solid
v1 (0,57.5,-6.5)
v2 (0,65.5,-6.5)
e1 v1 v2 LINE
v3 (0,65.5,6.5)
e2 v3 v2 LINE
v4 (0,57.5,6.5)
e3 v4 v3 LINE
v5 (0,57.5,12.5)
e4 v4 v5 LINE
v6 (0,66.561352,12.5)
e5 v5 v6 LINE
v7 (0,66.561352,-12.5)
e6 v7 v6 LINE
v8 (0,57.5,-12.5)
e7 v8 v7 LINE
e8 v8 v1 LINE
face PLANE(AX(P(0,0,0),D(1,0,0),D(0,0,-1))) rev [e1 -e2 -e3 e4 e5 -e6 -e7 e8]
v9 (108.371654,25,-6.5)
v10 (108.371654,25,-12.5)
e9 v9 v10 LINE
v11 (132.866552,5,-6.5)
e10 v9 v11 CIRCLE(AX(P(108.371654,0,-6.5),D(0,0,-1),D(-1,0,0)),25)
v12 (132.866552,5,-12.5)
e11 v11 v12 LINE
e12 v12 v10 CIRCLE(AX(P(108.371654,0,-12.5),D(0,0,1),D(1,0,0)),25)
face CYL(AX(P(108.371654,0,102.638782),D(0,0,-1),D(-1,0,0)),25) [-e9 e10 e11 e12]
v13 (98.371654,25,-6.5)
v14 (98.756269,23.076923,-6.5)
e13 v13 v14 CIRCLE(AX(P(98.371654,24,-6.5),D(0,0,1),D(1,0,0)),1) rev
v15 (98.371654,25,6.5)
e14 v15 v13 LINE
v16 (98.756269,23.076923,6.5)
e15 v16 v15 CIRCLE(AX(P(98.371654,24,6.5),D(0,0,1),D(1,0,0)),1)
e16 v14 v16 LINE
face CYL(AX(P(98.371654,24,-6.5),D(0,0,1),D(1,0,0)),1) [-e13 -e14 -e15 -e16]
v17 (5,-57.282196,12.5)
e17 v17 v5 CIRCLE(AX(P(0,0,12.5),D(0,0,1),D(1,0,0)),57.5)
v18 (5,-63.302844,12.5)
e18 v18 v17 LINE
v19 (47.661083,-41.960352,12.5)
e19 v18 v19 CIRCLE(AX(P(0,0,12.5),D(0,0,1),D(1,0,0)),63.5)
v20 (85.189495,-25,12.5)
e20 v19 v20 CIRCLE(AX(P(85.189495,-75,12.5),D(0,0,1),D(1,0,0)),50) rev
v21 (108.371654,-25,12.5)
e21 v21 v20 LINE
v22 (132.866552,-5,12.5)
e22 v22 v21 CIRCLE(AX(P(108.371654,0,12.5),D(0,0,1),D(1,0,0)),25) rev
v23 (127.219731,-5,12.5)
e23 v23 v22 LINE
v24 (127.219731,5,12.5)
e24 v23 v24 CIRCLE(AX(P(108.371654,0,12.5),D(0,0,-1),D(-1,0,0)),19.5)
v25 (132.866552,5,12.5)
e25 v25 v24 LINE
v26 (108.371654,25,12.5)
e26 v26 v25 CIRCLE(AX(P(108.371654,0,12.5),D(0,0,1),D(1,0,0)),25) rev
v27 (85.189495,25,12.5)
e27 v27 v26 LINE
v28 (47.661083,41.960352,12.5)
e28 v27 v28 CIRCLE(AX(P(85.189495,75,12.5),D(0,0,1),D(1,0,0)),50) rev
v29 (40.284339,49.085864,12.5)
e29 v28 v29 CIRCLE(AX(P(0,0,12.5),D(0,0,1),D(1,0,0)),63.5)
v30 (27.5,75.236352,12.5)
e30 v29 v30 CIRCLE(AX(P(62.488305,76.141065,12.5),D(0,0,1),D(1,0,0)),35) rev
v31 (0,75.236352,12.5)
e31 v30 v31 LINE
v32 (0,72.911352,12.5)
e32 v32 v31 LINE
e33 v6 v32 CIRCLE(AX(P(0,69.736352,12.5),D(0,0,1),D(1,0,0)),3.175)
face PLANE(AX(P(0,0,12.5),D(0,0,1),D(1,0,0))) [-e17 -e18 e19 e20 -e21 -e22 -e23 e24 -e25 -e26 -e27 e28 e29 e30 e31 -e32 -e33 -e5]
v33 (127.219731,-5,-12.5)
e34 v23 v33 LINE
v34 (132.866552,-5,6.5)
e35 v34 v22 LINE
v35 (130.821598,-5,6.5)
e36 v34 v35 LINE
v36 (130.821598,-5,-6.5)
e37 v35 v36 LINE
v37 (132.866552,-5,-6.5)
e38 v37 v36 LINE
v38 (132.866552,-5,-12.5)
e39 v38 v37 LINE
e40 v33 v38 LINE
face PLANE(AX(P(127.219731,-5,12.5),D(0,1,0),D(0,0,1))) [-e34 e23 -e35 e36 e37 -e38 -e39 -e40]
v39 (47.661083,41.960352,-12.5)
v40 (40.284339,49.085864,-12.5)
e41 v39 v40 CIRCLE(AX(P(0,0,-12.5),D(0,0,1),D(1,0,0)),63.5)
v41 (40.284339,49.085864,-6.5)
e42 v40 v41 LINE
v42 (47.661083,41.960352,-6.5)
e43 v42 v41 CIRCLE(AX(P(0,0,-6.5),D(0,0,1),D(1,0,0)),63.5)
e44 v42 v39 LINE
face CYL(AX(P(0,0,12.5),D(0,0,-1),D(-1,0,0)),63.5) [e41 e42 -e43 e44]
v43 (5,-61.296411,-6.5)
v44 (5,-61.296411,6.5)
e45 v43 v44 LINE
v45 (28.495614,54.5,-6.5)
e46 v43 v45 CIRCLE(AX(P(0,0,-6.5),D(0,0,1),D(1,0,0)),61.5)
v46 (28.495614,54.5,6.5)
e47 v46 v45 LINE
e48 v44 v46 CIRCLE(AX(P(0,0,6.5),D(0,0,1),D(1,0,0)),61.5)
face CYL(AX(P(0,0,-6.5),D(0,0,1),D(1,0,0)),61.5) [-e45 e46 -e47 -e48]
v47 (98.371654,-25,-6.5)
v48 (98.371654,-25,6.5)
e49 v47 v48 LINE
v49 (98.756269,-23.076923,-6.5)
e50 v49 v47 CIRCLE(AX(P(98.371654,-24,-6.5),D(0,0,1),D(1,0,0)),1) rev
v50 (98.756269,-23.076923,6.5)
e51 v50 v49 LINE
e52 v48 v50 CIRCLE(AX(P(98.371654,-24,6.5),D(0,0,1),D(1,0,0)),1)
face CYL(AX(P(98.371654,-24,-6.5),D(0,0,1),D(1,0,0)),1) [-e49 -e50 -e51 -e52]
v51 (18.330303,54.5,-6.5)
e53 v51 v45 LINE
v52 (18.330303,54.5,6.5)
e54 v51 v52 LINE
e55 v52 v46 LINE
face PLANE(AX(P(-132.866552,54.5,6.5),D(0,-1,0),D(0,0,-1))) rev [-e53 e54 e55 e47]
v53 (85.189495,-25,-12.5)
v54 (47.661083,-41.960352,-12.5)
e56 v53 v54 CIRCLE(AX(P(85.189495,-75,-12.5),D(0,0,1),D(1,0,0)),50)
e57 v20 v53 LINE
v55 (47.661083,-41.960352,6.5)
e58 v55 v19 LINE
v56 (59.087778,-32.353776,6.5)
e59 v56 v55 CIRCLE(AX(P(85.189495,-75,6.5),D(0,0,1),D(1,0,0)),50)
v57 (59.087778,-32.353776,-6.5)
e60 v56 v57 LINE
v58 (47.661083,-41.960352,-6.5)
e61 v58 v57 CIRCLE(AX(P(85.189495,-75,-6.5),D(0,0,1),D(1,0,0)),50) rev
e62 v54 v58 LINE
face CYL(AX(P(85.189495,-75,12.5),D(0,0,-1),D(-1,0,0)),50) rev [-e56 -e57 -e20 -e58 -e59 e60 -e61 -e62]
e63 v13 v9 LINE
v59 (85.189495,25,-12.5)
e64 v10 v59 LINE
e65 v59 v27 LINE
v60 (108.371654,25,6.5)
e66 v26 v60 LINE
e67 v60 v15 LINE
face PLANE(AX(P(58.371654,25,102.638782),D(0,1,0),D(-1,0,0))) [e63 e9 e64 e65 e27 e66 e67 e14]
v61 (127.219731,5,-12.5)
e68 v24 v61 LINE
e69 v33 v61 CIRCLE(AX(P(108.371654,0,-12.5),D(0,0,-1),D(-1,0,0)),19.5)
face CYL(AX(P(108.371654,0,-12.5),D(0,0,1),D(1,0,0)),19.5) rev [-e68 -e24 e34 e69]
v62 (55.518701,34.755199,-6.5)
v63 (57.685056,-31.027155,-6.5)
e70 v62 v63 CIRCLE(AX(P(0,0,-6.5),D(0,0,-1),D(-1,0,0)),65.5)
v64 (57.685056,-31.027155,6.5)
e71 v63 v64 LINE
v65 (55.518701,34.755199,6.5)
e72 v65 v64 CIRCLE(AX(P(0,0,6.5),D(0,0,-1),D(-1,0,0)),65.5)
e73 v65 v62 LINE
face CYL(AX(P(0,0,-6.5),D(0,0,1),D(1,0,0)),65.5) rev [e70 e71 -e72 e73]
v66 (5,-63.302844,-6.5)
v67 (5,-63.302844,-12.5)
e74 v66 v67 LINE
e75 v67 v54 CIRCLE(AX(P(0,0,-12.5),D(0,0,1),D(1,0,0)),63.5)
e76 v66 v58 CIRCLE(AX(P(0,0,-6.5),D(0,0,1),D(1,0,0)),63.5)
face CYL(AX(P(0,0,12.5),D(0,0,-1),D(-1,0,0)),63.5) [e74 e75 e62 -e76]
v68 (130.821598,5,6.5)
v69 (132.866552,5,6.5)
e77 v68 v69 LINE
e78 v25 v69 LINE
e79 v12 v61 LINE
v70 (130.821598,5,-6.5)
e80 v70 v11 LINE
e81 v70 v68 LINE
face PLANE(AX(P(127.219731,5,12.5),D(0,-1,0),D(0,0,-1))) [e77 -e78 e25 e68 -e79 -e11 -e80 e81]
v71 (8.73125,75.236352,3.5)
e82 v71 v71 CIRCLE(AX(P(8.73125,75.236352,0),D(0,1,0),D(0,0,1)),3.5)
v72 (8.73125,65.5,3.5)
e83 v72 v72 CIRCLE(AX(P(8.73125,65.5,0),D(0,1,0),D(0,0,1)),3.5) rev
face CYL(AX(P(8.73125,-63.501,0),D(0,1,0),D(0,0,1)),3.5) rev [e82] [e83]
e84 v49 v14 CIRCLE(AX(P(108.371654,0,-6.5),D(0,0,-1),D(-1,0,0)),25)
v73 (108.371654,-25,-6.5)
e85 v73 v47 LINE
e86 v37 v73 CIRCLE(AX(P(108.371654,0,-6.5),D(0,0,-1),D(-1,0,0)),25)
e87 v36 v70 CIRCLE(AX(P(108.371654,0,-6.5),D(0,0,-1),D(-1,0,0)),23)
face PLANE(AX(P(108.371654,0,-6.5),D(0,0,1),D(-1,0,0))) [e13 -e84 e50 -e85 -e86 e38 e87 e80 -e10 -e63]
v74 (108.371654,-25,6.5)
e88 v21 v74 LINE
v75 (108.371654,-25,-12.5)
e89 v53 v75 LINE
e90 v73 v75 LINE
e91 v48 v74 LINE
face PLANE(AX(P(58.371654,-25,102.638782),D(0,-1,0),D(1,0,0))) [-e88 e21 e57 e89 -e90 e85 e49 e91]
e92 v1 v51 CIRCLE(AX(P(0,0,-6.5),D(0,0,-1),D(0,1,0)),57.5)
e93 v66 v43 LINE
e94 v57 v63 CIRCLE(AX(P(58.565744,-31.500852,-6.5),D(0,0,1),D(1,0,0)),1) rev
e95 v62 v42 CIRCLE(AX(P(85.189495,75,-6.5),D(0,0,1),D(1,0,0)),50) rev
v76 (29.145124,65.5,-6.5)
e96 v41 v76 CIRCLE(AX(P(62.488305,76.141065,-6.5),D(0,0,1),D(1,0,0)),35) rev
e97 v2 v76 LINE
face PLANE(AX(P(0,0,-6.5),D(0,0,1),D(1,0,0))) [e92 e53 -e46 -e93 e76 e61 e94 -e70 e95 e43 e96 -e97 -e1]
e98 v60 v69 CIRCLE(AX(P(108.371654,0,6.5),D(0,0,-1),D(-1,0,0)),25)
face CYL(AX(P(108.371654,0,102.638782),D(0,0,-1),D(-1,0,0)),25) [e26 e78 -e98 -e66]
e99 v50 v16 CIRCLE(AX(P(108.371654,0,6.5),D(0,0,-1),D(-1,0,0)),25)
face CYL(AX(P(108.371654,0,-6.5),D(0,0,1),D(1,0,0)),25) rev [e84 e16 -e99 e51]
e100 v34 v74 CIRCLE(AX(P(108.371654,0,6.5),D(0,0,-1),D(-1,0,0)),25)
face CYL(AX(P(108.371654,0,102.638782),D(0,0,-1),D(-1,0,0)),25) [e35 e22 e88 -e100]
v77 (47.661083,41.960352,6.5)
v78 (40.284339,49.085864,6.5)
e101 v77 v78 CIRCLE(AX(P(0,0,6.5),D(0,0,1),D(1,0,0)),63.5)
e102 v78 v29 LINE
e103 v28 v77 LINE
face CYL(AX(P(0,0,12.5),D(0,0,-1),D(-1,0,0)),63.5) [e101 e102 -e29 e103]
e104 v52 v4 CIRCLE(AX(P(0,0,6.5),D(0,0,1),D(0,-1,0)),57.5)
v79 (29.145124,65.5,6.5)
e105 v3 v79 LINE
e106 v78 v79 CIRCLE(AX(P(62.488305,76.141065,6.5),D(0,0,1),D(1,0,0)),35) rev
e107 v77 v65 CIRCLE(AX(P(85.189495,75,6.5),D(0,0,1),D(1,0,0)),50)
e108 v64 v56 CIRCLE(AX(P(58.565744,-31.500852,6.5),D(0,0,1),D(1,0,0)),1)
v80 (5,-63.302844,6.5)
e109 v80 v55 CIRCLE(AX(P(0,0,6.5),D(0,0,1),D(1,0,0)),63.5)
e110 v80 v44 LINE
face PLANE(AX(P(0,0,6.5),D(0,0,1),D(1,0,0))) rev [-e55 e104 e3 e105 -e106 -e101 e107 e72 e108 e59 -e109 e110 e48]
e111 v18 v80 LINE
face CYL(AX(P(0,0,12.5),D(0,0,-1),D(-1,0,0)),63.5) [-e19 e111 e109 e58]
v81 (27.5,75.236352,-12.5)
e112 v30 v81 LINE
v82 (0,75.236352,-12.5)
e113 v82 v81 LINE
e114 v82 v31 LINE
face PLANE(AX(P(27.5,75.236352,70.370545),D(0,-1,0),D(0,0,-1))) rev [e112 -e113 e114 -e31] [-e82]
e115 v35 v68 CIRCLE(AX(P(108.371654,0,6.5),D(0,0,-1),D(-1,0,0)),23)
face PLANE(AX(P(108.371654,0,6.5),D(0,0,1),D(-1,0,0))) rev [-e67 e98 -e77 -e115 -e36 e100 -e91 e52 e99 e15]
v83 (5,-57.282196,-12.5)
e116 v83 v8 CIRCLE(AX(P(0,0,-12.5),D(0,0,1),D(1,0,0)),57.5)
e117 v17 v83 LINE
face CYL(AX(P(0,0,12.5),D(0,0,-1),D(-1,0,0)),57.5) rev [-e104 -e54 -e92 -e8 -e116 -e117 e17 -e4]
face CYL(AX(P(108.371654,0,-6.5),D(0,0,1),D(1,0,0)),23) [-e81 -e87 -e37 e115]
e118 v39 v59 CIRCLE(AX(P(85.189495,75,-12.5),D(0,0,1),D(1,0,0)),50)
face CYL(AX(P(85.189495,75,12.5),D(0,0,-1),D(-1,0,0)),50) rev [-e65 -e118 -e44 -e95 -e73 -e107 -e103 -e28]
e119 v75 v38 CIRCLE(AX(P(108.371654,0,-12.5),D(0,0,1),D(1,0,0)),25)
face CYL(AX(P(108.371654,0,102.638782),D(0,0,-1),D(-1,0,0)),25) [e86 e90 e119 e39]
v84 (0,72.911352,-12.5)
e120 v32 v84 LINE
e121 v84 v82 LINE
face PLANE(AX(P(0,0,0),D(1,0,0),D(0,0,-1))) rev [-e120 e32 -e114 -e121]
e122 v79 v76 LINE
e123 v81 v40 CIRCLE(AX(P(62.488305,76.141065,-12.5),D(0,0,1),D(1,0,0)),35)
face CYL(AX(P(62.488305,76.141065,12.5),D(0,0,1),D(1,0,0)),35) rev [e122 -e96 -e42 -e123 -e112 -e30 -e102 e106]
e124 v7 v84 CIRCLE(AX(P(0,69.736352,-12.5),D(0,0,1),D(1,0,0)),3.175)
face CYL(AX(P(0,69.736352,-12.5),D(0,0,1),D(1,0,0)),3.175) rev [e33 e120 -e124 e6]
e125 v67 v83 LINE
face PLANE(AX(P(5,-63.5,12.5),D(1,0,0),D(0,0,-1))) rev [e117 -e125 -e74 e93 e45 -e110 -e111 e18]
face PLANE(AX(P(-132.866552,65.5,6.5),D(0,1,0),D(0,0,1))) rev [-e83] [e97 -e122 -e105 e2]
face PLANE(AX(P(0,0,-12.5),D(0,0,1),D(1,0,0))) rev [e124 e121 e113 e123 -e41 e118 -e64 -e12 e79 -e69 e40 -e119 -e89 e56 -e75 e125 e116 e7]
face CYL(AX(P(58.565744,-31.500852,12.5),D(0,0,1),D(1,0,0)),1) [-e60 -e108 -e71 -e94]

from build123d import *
from build123d.topology import SkipClean

# Parameters (mm, degrees)
SKETCH1_R                        = 63.5
SKETCH1_R_2                      = 57.5
MAIN_SHAPE_DEPTH                 = 12.5
MOTOR_MOUNT_REACH                = 92.668
MOTOR_MOUNT_DIRECTION_2_REACH    = 92.668
HARNESS_START                    = -12.5
HARNESS_DEPTH                    = 25
HARNESS_FILLET_R                 = 35
SKETCH3_R                        = 65.5
SKETCH3_R_2                      = 61.5
MAIN_SLOT_DEPTH                  = 6.5
SKETCH8_R                        = 19.5
MOTOR_CUT_DEPTH                  = 154.6383962
SKETCH9_R                        = 25
SKETCH9_R_2                      = 23
MOTOR_SLOT_DEPTH                 = 6.5
MOTOR_MOUNT_FILLET_R             = 50
SKETCH17_W                       = 6.80384635
SKETCH17_H                       = 10
MOTOR_KEYWAY_DEPTH               = 156.156394606
MOTOR_MOUNT_FILLET_OF_MIRROR_2_R = 50
BOLT_HOLES_REACH                 = 194.503
BOLT_HOLES_END_RADIUS            = 65.5
SKETCH13_R                       = 3.5
SKETCH15_W                       = 10
SKETCH15_H                       = 25
MAIN_KEYWAY_DEPTH                = 154.200127936
HARNESS_CUT_DEPTH                = 154.200127936
HARNESS_CUT_DEPTH_BACK           = 154.200127936
SKETCH19_W                       = 13
SKETCH19_H                       = 11
SKETCH22_R                       = 3.175
CUT_EXTRUDE1_DEPTH               = 155.72242625
FILLET1_START                    = -6.5
FILLET1_DEPTH                    = 13
SKETCH18_W                       = 87.910822745
SKETCH18_H                       = 167.162250969
SPLIT_FOR_PRINTING_DEPTH         = 154.200127887


with BuildPart() as part:
    # Sketch1 → main shape (new, symmetric)
    with BuildSketch(Plane.XY):
        Circle(SKETCH1_R)
        Circle(SKETCH1_R_2, mode=Mode.SUBTRACT)
    extrude(amount=MAIN_SHAPE_DEPTH, both=True)

    # motor mount: up to this face of the body (flat: up to its plane)
    motor_mount_end = Plane(part.part.faces().sort_by_distance((-61.703948776, 0, 12.5))[0])
    # Sketch6 → motor mount (add, up to the picked face)
    with BuildSketch(Plane.XY, mode=Mode.PRIVATE) as motor_mount_sk1:
        with BuildLine():
            Line((-58.37165408, 25), (-108.37165408, 25))
            ThreePointArc((-108.37165408, 25), (-133.37165408, 0), (-108.37165408, -25))
            Line((-108.37165408, -25), (-58.37165408, -25))
            ThreePointArc((-58.37165408, -25), (-63.5, 0), (-58.37165408, 25))
        make_face()
    motor_mount_tool1 = split(extrude(motor_mount_sk1.sketch, amount=MOTOR_MOUNT_REACH, mode=Mode.PRIVATE), bisect_by=motor_mount_end, keep=Keep.BOTH, mode=Mode.PRIVATE)
    motor_mount = motor_mount_tool1.solids().sort_by(Axis((-95.130644, 0, 0), (0, 0, 1)))[0]
    add(motor_mount)

    # motor mount direction 2: up to this face of the body (flat: up to its plane)
    motor_mount_direction_2_end = Plane(part.part.faces().sort_by_distance((-61.703948776, 0, -12.5))[0])
    # Sketch6 → motor mount direction 2 (add, up to the picked face)
    with BuildSketch(Plane.XY, mode=Mode.PRIVATE) as motor_mount_direction_2_sk1:
        with BuildLine():
            Line((-58.37165408, 25), (-108.37165408, 25))
            ThreePointArc((-108.37165408, 25), (-133.37165408, 0), (-108.37165408, -25))
            Line((-108.37165408, -25), (-58.37165408, -25))
            ThreePointArc((-58.37165408, -25), (-63.5, 0), (-58.37165408, 25))
        make_face()
    motor_mount_direction_2_tool1 = split(extrude(motor_mount_direction_2_sk1.sketch, amount=-MOTOR_MOUNT_DIRECTION_2_REACH, mode=Mode.PRIVATE), bisect_by=motor_mount_direction_2_end, keep=Keep.BOTH, mode=Mode.PRIVATE)
    motor_mount_direction_2 = motor_mount_direction_2_tool1.solids().sort_by(Axis((-95.130644, 0, 0), (0, 0, -1)))[0]
    add(motor_mount_direction_2)

    # Sketch11 → harness (add)
    with BuildSketch(Plane.XY.offset(HARNESS_START)):
        with BuildLine():
            Line((27.5, 75.236352085), (27.5, 57.236352085))
            ThreePointArc((27.5, 57.236352085), (0, 63.5), (-27.5, 57.236352085))
            Line((-27.5, 57.236352085), (-27.5, 75.236352085))
            Line((-27.5, 75.236352085), (27.5, 75.236352085))
        make_face()
    extrude(amount=HARNESS_DEPTH)

    # harness fillet
    # the kernel refuses this fillet: 35 mm, written as the material it adds along each edge
    with BuildSketch(Plane(origin=(27.5, 57.236352085, -12.5), x_dir=(0.8432130840370694, -0.5375794777599814, 0), z_dir=(0, 0, 1))) as harness_fillet_piece_1:
        with BuildLine():
            CenterArc((19.339811168, 34.749695763), HARNESS_FILLET_R, 214.0002145, 49.143374048)
            Line((-9.6764306, 15.177835513), (-10.256755435, 14.786398308))
            ThreePointArc((-10.256755435, 14.786398308), (-5.428464459, 7.212612122), (-0.590249159, -0.376305634))
            Line((-0.590249159, -0.376305634), (0.083567085, -0.694993915))
            ThreePointArc((0.083567085, -0.694993915), (7.580728452, -0.245876599), (15.077889818, -0.694993915))
            Line((15.077889818, -0.694993915), (15.161456903, 0))
        make_face()
    extrude(amount=25)
    with BuildSketch(Plane(origin=(-27.5, 57.236352085, -12.5), x_dir=(-0.8432130840370696, -0.5375794777599807, 0), z_dir=(0, 0, 1))) as harness_fillet_piece_2:
        with BuildLine():
            CenterArc((19.339811168, -34.749695763), HARNESS_FILLET_R, 96.856411452, 49.143374048)
            Line((-9.6764306, -15.177835513), (-10.256755435, -14.786398308))
            ThreePointArc((-10.256755435, -14.786398308), (-5.428464459, -7.212612122), (-0.590249159, 0.376305634))
            Line((-0.590249159, 0.376305634), (0.083567085, 0.694993915))
            ThreePointArc((0.083567085, 0.694993915), (7.580728452, 0.245876599), (15.077889818, 0.694993915))
            Line((15.077889818, 0.694993915), (15.161456903, 0))
        make_face()
    extrude(amount=25)

    # Sketch3 → main slot (cut, symmetric)
    with BuildSketch(Plane.XY):
        Circle(SKETCH3_R)
        Circle(SKETCH3_R_2, mode=Mode.SUBTRACT)
    main_slot = extrude(amount=MAIN_SLOT_DEPTH, both=True, mode=Mode.SUBTRACT)

    # Sketch8 → motor cut (cut, symmetric)
    with BuildSketch(Plane.XY):
        with Locations((-108.37165408, 0)):
            Circle(SKETCH8_R)
    motor_cut = extrude(amount=MOTOR_CUT_DEPTH, both=True, mode=Mode.SUBTRACT)

    # Sketch9 → motor slot (cut, symmetric)
    with BuildSketch(Plane.XY):
        with Locations((-108.37165408, 0)):
            Circle(SKETCH9_R)
        with Locations((-108.37165408, 0)):
            Circle(SKETCH9_R_2, mode=Mode.SUBTRACT)
    motor_slot = extrude(amount=MOTOR_SLOT_DEPTH, both=True, mode=Mode.SUBTRACT)

    # motor mount fillet
    # the kernel refuses this fillet: 50 mm, written as the material it adds along each edge
    with BuildSketch(Plane(origin=(-58.37165408, 25, -12.5), x_dir=(0.5339491439674308, 0.845516594548237, 0), z_dir=(0, 0, 1))) as motor_mount_fillet_piece_1_section:
        with BuildLine():
            CenterArc((27.956466708, 49.372386437), MOTOR_MOUNT_FILLET_R, 212.272672979, 48.639624147)
            Line((-14.31936302, 22.674929238), (0, 0))
            ThreePointArc((0, 0), (10.029579864, 0.797069225), (20.059159728, 0))
        make_face()
    motor_mount_fillet_piece_1 = extrude(amount=6, mode=Mode.PRIVATE)
    motor_mount_fillet_piece_1 = motor_mount_fillet_piece_1 & Plane(origin=(0, 0, -12.5), x_dir=(1, 0, 0), z_dir=(0, 0, 1)) * Cylinder(65.5, 103, mode=Mode.PRIVATE)
    add(motor_mount_fillet_piece_1)
    with BuildSketch(Plane(origin=(-58.37165408, 25, -12.5), x_dir=(0.5339491439674308, 0.845516594548237, 0), z_dir=(0, 0, 1))) as motor_mount_fillet_piece_2_section:
        with BuildLine():
            CenterArc((27.956466708, 49.372386437), MOTOR_MOUNT_FILLET_R, 212.272672979, 48.639624147)
            Line((-14.31936302, 22.674929238), (0, 0))
            ThreePointArc((0, 0), (10.029579864, 0.797069225), (20.059159728, 0))
        make_face()
    motor_mount_fillet_piece_2 = extrude(amount=6, mode=Mode.PRIVATE)
    motor_mount_fillet_piece_2 = motor_mount_fillet_piece_2 - Plane(origin=(0, 0, -12.5), x_dir=(1, 0, 0), z_dir=(0, 0, 1)) * Cylinder(65.5, 103, mode=Mode.PRIVATE)
    add(motor_mount_fillet_piece_2)
    with BuildSketch(Plane(origin=(-58.37165408, 25, -12.5), x_dir=(0.5339491439674308, 0.845516594548237, 0), z_dir=(0, 0, 1))) as motor_mount_fillet_piece_3_section:
        with BuildLine():
            CenterArc((27.956466708, 49.372386437), MOTOR_MOUNT_FILLET_R, 212.272672979, 48.639624147)
            Line((-14.31936302, 22.674929238), (0, 0))
            ThreePointArc((0, 0), (10.029579864, 0.797069225), (20.059159728, 0))
        make_face()
    motor_mount_fillet_piece_3 = extrude(amount=73.044601445, mode=Mode.PRIVATE)
    motor_mount_fillet_piece_3 = split(motor_mount_fillet_piece_3, bisect_by=Plane(origin=(-58.37165408, 25, -6.5), z_dir=(0, 0, 1)), keep=Keep.TOP, mode=Mode.PRIVATE)
    motor_mount_fillet_piece_3 = split(motor_mount_fillet_piece_3, bisect_by=Plane(origin=(-58.37165408, 25, 6.5), z_dir=(0, 0, -1)), keep=Keep.TOP, mode=Mode.PRIVATE)
    motor_mount_fillet_piece_3 = motor_mount_fillet_piece_3 - Plane(origin=(0, 0, -12.5), x_dir=(1, 0, 0), z_dir=(0, 0, 1)) * Cylinder(65.5, 237, mode=Mode.PRIVATE)
    add(motor_mount_fillet_piece_3)
    with BuildSketch(Plane(origin=(-58.37165408, 25, -12.5), x_dir=(0.5339491439674308, 0.845516594548237, 0), z_dir=(0, 0, 1))) as motor_mount_fillet_piece_4_section:
        with BuildLine():
            CenterArc((27.956466708, 49.372386437), MOTOR_MOUNT_FILLET_R, 212.272672979, 48.639624147)
            Line((-14.31936302, 22.674929238), (0, 0))
            ThreePointArc((0, 0), (10.029579864, 0.797069225), (20.059159728, 0))
        make_face()
    motor_mount_fillet_piece_4 = extrude(amount=73.044601445, mode=Mode.PRIVATE)
    motor_mount_fillet_piece_4 = split(motor_mount_fillet_piece_4, bisect_by=Plane(origin=(-58.37165408, 25, 12.5), z_dir=(0, 0, -1)), keep=Keep.TOP, mode=Mode.PRIVATE)
    motor_mount_fillet_piece_4 = split(motor_mount_fillet_piece_4, bisect_by=Plane(origin=(-58.37165408, 25, 6.5), z_dir=(0, 0, 1)), keep=Keep.TOP, mode=Mode.PRIVATE)
    motor_mount_fillet_piece_4 = motor_mount_fillet_piece_4 & Plane(origin=(0, 0, -12.5), x_dir=(1, 0, 0), z_dir=(0, 0, 1)) * Cylinder(65.5, 237, mode=Mode.PRIVATE)
    add(motor_mount_fillet_piece_4)
    with BuildSketch(Plane(origin=(-58.37165408, 25, -12.5), x_dir=(0.5339491439674308, 0.845516594548237, 0), z_dir=(0, 0, 1))) as motor_mount_fillet_piece_5_section:
        with BuildLine():
            CenterArc((27.956466708, 49.372386437), MOTOR_MOUNT_FILLET_R, 212.272672979, 48.639624147)
            Line((-14.31936302, 22.674929238), (0, 0))
            ThreePointArc((0, 0), (10.029579864, 0.797069225), (20.059159728, 0))
        make_face()
    motor_mount_fillet_piece_5 = extrude(amount=73.044601445, mode=Mode.PRIVATE)
    motor_mount_fillet_piece_5 = split(motor_mount_fillet_piece_5, bisect_by=Plane(origin=(-58.37165408, 25, 12.5), z_dir=(0, 0, -1)), keep=Keep.TOP, mode=Mode.PRIVATE)
    motor_mount_fillet_piece_5 = split(motor_mount_fillet_piece_5, bisect_by=Plane(origin=(-58.37165408, 25, 6.5), z_dir=(0, 0, 1)), keep=Keep.TOP, mode=Mode.PRIVATE)
    motor_mount_fillet_piece_5 = motor_mount_fillet_piece_5 - Plane(origin=(0, 0, -12.5), x_dir=(1, 0, 0), z_dir=(0, 0, 1)) * Cylinder(65.5, 237, mode=Mode.PRIVATE)
    add(motor_mount_fillet_piece_5)
    with BuildSketch(Plane(origin=(-58.37165408, -25, 12.5), x_dir=(-1, 0, 0), z_dir=(0, 0, -1))) as motor_mount_fillet_piece_6_section:
        with BuildLine():
            CenterArc((26.817840578, -50), MOTOR_MOUNT_FILLET_R, 90, 48.639624147)
            ThreePointArc((-10.710571166, -16.960352423), (-4.681350326, -8.905770642), (0, 0))
            Line((0, 0), (26.817840578, 0))
        make_face()
    motor_mount_fillet_piece_6 = extrude(amount=6, mode=Mode.PRIVATE)
    motor_mount_fillet_piece_6 = motor_mount_fillet_piece_6 - Plane(origin=(0, 0, 12.5), x_dir=(1, 0, 0), z_dir=(0, 0, 1)) * Cylinder(65.5, 120, mode=Mode.PRIVATE)
    add(motor_mount_fillet_piece_6)
    with BuildSketch(Plane(origin=(-58.37165408, -25, 12.5), x_dir=(-1, 0, 0), z_dir=(0, 0, -1))) as motor_mount_fillet_piece_7_section:
        with BuildLine():
            CenterArc((26.817840578, -50), MOTOR_MOUNT_FILLET_R, 90, 48.639624147)
            ThreePointArc((-10.710571166, -16.960352423), (-4.681350326, -8.905770642), (0, 0))
            Line((0, 0), (26.817840578, 0))
        make_face()
    motor_mount_fillet_piece_7 = extrude(amount=6, mode=Mode.PRIVATE)
    motor_mount_fillet_piece_7 = motor_mount_fillet_piece_7 & Plane(origin=(0, 0, 12.5), x_dir=(1, 0, 0), z_dir=(0, 0, 1)) * Cylinder(65.5, 120, mode=Mode.PRIVATE)
    add(motor_mount_fillet_piece_7)
    with BuildSketch(Plane(origin=(-58.37165408, -25, 12.5), x_dir=(-1, 0, 0), z_dir=(0, 0, -1))) as motor_mount_fillet_piece_8_section:
        with BuildLine():
            CenterArc((26.817840578, -50), MOTOR_MOUNT_FILLET_R, 90, 48.639624147)
            ThreePointArc((-10.710571166, -16.960352423), (-4.681350326, -8.905770642), (0, 0))
            Line((0, 0), (26.817840578, 0))
        make_face()
    motor_mount_fillet_piece_8 = extrude(amount=73.044601445, mode=Mode.PRIVATE)
    motor_mount_fillet_piece_8 = split(motor_mount_fillet_piece_8, bisect_by=Plane(origin=(-58.37165408, -25, 6.5), z_dir=(0, 0, -1)), keep=Keep.TOP, mode=Mode.PRIVATE)
    motor_mount_fillet_piece_8 = motor_mount_fillet_piece_8 - Plane(origin=(0, 0, 12.5), x_dir=(1, 0, 0), z_dir=(0, 0, 1)) * Cylinder(65.5, 254, mode=Mode.PRIVATE)
    motor_mount_fillet_piece_8 = split(motor_mount_fillet_piece_8, bisect_by=Plane(origin=(-58.37165408, -25, -6.5), z_dir=(0, 0, 1)), keep=Keep.TOP, mode=Mode.PRIVATE)
    add(motor_mount_fillet_piece_8)
    with BuildSketch(Plane(origin=(-58.37165408, -25, 12.5), x_dir=(-1, 0, 0), z_dir=(0, 0, -1))) as motor_mount_fillet_piece_9_section:
        with BuildLine():
            CenterArc((26.817840578, -50), MOTOR_MOUNT_FILLET_R, 90, 48.639624147)
            ThreePointArc((-10.710571166, -16.960352423), (-4.681350326, -8.905770642), (0, 0))
            Line((0, 0), (26.817840578, 0))
        make_face()
    motor_mount_fillet_piece_9 = extrude(amount=73.044601445, mode=Mode.PRIVATE)
    motor_mount_fillet_piece_9 = motor_mount_fillet_piece_9 - Plane(origin=(0, 0, 12.5), x_dir=(1, 0, 0), z_dir=(0, 0, 1)) * Cylinder(65.5, 254, mode=Mode.PRIVATE)
    motor_mount_fillet_piece_9 = split(motor_mount_fillet_piece_9, bisect_by=Plane(origin=(-58.37165408, -25, -6.5), z_dir=(0, 0, -1)), keep=Keep.TOP, mode=Mode.PRIVATE)
    motor_mount_fillet_piece_9 = split(motor_mount_fillet_piece_9, bisect_by=Plane(origin=(-58.37165408, -25, -12.5), z_dir=(0, 0, 1)), keep=Keep.TOP, mode=Mode.PRIVATE)
    add(motor_mount_fillet_piece_9)
    with BuildSketch(Plane(origin=(-58.37165408, -25, 12.5), x_dir=(-1, 0, 0), z_dir=(0, 0, -1))) as motor_mount_fillet_piece_10_section:
        with BuildLine():
            CenterArc((26.817840578, -50), MOTOR_MOUNT_FILLET_R, 90, 48.639624147)
            ThreePointArc((-10.710571166, -16.960352423), (-4.681350326, -8.905770642), (0, 0))
            Line((0, 0), (26.817840578, 0))
        make_face()
    motor_mount_fillet_piece_10 = extrude(amount=73.044601445, mode=Mode.PRIVATE)
    motor_mount_fillet_piece_10 = motor_mount_fillet_piece_10 & Plane(origin=(0, 0, 12.5), x_dir=(1, 0, 0), z_dir=(0, 0, 1)) * Cylinder(65.5, 254, mode=Mode.PRIVATE)
    motor_mount_fillet_piece_10 = split(motor_mount_fillet_piece_10, bisect_by=Plane(origin=(-58.37165408, -25, -6.5), z_dir=(0, 0, -1)), keep=Keep.TOP, mode=Mode.PRIVATE)
    motor_mount_fillet_piece_10 = split(motor_mount_fillet_piece_10, bisect_by=Plane(origin=(-58.37165408, -25, -12.5), z_dir=(0, 0, 1)), keep=Keep.TOP, mode=Mode.PRIVATE)
    add(motor_mount_fillet_piece_10)

    # Sketch17 → motor keyway (cut, through all)
    with BuildSketch(Plane(origin=(0, 0, -12.5), x_dir=(-1, 0, 0), z_dir=(0, 0, -1))):
        with Locations((130.62165408, 0)):
            Rectangle(SKETCH17_W, SKETCH17_H)
    motor_keyway = extrude(amount=-MOTOR_KEYWAY_DEPTH, mode=Mode.SUBTRACT)

    # Mirror 2: motor mount, motor mount direction 2, main slot, motor cut, motor slot, motor keyway across plane
    with SkipClean():  # the faces are left unmerged after this step: merging them gives an invalid solid
        add(motor_mount.mirror(Plane(origin=(0, 0, 0), x_dir=(0, 0, 1), z_dir=(1, 0, 0))))
        add(motor_mount_direction_2.mirror(Plane(origin=(0, 0, 0), x_dir=(0, 0, 1), z_dir=(1, 0, 0))))
        add(main_slot.mirror(Plane(origin=(0, 0, 0), x_dir=(0, 0, 1), z_dir=(1, 0, 0))), mode=Mode.SUBTRACT)
        add(motor_cut.mirror(Plane(origin=(0, 0, 0), x_dir=(0, 0, 1), z_dir=(1, 0, 0))), mode=Mode.SUBTRACT)
        add(motor_slot.mirror(Plane(origin=(0, 0, 0), x_dir=(0, 0, 1), z_dir=(1, 0, 0))), mode=Mode.SUBTRACT)
        add(motor_keyway.mirror(Plane(origin=(0, 0, 0), x_dir=(0, 0, 1), z_dir=(1, 0, 0))), mode=Mode.SUBTRACT)

    # motor mount fillet of Mirror 2
    # the kernel refuses this fillet: 50 mm, written as the material it adds along each edge
    with BuildSketch(Plane(origin=(58.37165408, 25, 60.544601445), x_dir=(-0.5339491439674316, 0.8455165945482365, 0), z_dir=(0, 0, -1))) as motor_mount_fillet_of_mirror_2_piece_1_section:
        with BuildLine():
            CenterArc((27.956466708, 49.372386437), MOTOR_MOUNT_FILLET_OF_MIRROR_2_R, 212.272672979, 48.639624147)
            Line((-14.31936302, 22.674929238), (0, 0))
            ThreePointArc((0, 0), (10.029579864, 0.797069225), (20.059159728, 0))
        make_face()
    motor_mount_fillet_of_mirror_2_piece_1 = extrude(amount=73.044601445, mode=Mode.PRIVATE)
    motor_mount_fillet_of_mirror_2_piece_1 = split(motor_mount_fillet_of_mirror_2_piece_1, bisect_by=Plane(origin=(58.37165408, 25, 12.5), z_dir=(0, 0, -1)), keep=Keep.TOP, mode=Mode.PRIVATE)
    motor_mount_fillet_of_mirror_2_piece_1 = split(motor_mount_fillet_of_mirror_2_piece_1, bisect_by=Plane(origin=(58.37165408, 25, 6.5), z_dir=(0, 0, 1)), keep=Keep.TOP, mode=Mode.PRIVATE)
    motor_mount_fillet_of_mirror_2_piece_1 = motor_mount_fillet_of_mirror_2_piece_1 & Plane(origin=(0, 0, 60.544601445), x_dir=(-1, 0, 0), z_dir=(0, 0, 1)) * Cylinder(65.5, 237, mode=Mode.PRIVATE)
    add(motor_mount_fillet_of_mirror_2_piece_1)
    with BuildSketch(Plane(origin=(58.37165408, 25, 60.544601445), x_dir=(-0.5339491439674316, 0.8455165945482365, 0), z_dir=(0, 0, -1))) as motor_mount_fillet_of_mirror_2_piece_2_section:
        with BuildLine():
            CenterArc((27.956466708, 49.372386437), MOTOR_MOUNT_FILLET_OF_MIRROR_2_R, 212.272672979, 48.639624147)
            Line((-14.31936302, 22.674929238), (0, 0))
            ThreePointArc((0, 0), (10.029579864, 0.797069225), (20.059159728, 0))
        make_face()
    motor_mount_fillet_of_mirror_2_piece_2 = extrude(amount=73.044601445, mode=Mode.PRIVATE)
    motor_mount_fillet_of_mirror_2_piece_2 = split(motor_mount_fillet_of_mirror_2_piece_2, bisect_by=Plane(origin=(58.37165408, 25, 12.5), z_dir=(0, 0, -1)), keep=Keep.TOP, mode=Mode.PRIVATE)
    motor_mount_fillet_of_mirror_2_piece_2 = split(motor_mount_fillet_of_mirror_2_piece_2, bisect_by=Plane(origin=(58.37165408, 25, 6.5), z_dir=(0, 0, 1)), keep=Keep.TOP, mode=Mode.PRIVATE)
    motor_mount_fillet_of_mirror_2_piece_2 = motor_mount_fillet_of_mirror_2_piece_2 - Plane(origin=(0, 0, 60.544601445), x_dir=(-1, 0, 0), z_dir=(0, 0, 1)) * Cylinder(65.5, 237, mode=Mode.PRIVATE)
    add(motor_mount_fillet_of_mirror_2_piece_2)
    with BuildSketch(Plane(origin=(58.37165408, 25, 60.544601445), x_dir=(-0.5339491439674316, 0.8455165945482365, 0), z_dir=(0, 0, -1))) as motor_mount_fillet_of_mirror_2_piece_3_section:
        with BuildLine():
            CenterArc((27.956466708, 49.372386437), MOTOR_MOUNT_FILLET_OF_MIRROR_2_R, 212.272672979, 48.639624147)
            Line((-14.31936302, 22.674929238), (0, 0))
            ThreePointArc((0, 0), (10.029579864, 0.797069225), (20.059159728, 0))
        make_face()
    motor_mount_fillet_of_mirror_2_piece_3 = extrude(amount=73.044601445, mode=Mode.PRIVATE)
    motor_mount_fillet_of_mirror_2_piece_3 = split(motor_mount_fillet_of_mirror_2_piece_3, bisect_by=Plane(origin=(58.37165408, 25, 6.5), z_dir=(0, 0, -1)), keep=Keep.TOP, mode=Mode.PRIVATE)
    motor_mount_fillet_of_mirror_2_piece_3 = split(motor_mount_fillet_of_mirror_2_piece_3, bisect_by=Plane(origin=(58.37165408, 25, -6.5), z_dir=(0, 0, 1)), keep=Keep.TOP, mode=Mode.PRIVATE)
    motor_mount_fillet_of_mirror_2_piece_3 = motor_mount_fillet_of_mirror_2_piece_3 - Plane(origin=(0, 0, 60.544601445), x_dir=(-1, 0, 0), z_dir=(0, 0, 1)) * Cylinder(65.5, 237, mode=Mode.PRIVATE)
    add(motor_mount_fillet_of_mirror_2_piece_3)
    with BuildSketch(Plane(origin=(58.37165408, 25, -6.5), x_dir=(-0.5339491439674316, 0.8455165945482365, 0), z_dir=(0, 0, -1))) as motor_mount_fillet_of_mirror_2_piece_4_section:
        with BuildLine():
            CenterArc((27.956466708, 49.372386437), MOTOR_MOUNT_FILLET_OF_MIRROR_2_R, 212.272672979, 48.639624147)
            Line((-14.31936302, 22.674929238), (0, 0))
            ThreePointArc((0, 0), (10.029579864, 0.797069225), (20.059159728, 0))
        make_face()
    motor_mount_fillet_of_mirror_2_piece_4 = extrude(amount=6, mode=Mode.PRIVATE)
    motor_mount_fillet_of_mirror_2_piece_4 = motor_mount_fillet_of_mirror_2_piece_4 & Plane(origin=(0, 0, -6.5), x_dir=(-1, 0, 0), z_dir=(0, 0, 1)) * Cylinder(65.5, 103, mode=Mode.PRIVATE)
    add(motor_mount_fillet_of_mirror_2_piece_4)
    with BuildSketch(Plane(origin=(58.37165408, 25, -6.5), x_dir=(-0.5339491439674316, 0.8455165945482365, 0), z_dir=(0, 0, -1))) as motor_mount_fillet_of_mirror_2_piece_5_section:
        with BuildLine():
            CenterArc((27.956466708, 49.372386437), MOTOR_MOUNT_FILLET_OF_MIRROR_2_R, 212.272672979, 48.639624147)
            Line((-14.31936302, 22.674929238), (0, 0))
            ThreePointArc((0, 0), (10.029579864, 0.797069225), (20.059159728, 0))
        make_face()
    motor_mount_fillet_of_mirror_2_piece_5 = extrude(amount=6, mode=Mode.PRIVATE)
    motor_mount_fillet_of_mirror_2_piece_5 = motor_mount_fillet_of_mirror_2_piece_5 - Plane(origin=(0, 0, -6.5), x_dir=(-1, 0, 0), z_dir=(0, 0, 1)) * Cylinder(65.5, 103, mode=Mode.PRIVATE)
    add(motor_mount_fillet_of_mirror_2_piece_5)
    with BuildSketch(Plane(origin=(58.37165408, -25, -60.544601445), x_dir=(1, 0, 0), z_dir=(0, 0, 1))) as motor_mount_fillet_of_mirror_2_piece_6_section:
        with BuildLine():
            CenterArc((26.817840578, -50), MOTOR_MOUNT_FILLET_OF_MIRROR_2_R, 90, 48.639624147)
            ThreePointArc((-10.710571166, -16.960352423), (-4.681350326, -8.905770642), (0, 0))
            Line((0, 0), (26.817840578, 0))
        make_face()
    motor_mount_fillet_of_mirror_2_piece_6 = extrude(amount=73.044601445, mode=Mode.PRIVATE)
    motor_mount_fillet_of_mirror_2_piece_6 = split(motor_mount_fillet_of_mirror_2_piece_6, bisect_by=Plane(origin=(58.37165408, -25, -12.5), z_dir=(0, 0, 1)), keep=Keep.TOP, mode=Mode.PRIVATE)
    motor_mount_fillet_of_mirror_2_piece_6 = motor_mount_fillet_of_mirror_2_piece_6 - Plane(origin=(0, 0, -60.544601445), x_dir=(-1, 0, 0), z_dir=(0, 0, 1)) * Cylinder(65.5, 254, mode=Mode.PRIVATE)
    motor_mount_fillet_of_mirror_2_piece_6 = split(motor_mount_fillet_of_mirror_2_piece_6, bisect_by=Plane(origin=(58.37165408, -25, -6.5), z_dir=(0, 0, -1)), keep=Keep.TOP, mode=Mode.PRIVATE)
    add(motor_mount_fillet_of_mirror_2_piece_6)
    with BuildSketch(Plane(origin=(58.37165408, -25, -60.544601445), x_dir=(1, 0, 0), z_dir=(0, 0, 1))) as motor_mount_fillet_of_mirror_2_piece_7_section:
        with BuildLine():
            CenterArc((26.817840578, -50), MOTOR_MOUNT_FILLET_OF_MIRROR_2_R, 90, 48.639624147)
            ThreePointArc((-10.710571166, -16.960352423), (-4.681350326, -8.905770642), (0, 0))
            Line((0, 0), (26.817840578, 0))
        make_face()
    motor_mount_fillet_of_mirror_2_piece_7 = extrude(amount=73.044601445, mode=Mode.PRIVATE)
    motor_mount_fillet_of_mirror_2_piece_7 = split(motor_mount_fillet_of_mirror_2_piece_7, bisect_by=Plane(origin=(58.37165408, -25, -12.5), z_dir=(0, 0, 1)), keep=Keep.TOP, mode=Mode.PRIVATE)
    motor_mount_fillet_of_mirror_2_piece_7 = motor_mount_fillet_of_mirror_2_piece_7 & Plane(origin=(0, 0, -60.544601445), x_dir=(-1, 0, 0), z_dir=(0, 0, 1)) * Cylinder(65.5, 254, mode=Mode.PRIVATE)
    motor_mount_fillet_of_mirror_2_piece_7 = split(motor_mount_fillet_of_mirror_2_piece_7, bisect_by=Plane(origin=(58.37165408, -25, -6.5), z_dir=(0, 0, -1)), keep=Keep.TOP, mode=Mode.PRIVATE)
    add(motor_mount_fillet_of_mirror_2_piece_7)
    with BuildSketch(Plane(origin=(58.37165408, -25, -60.544601445), x_dir=(1, 0, 0), z_dir=(0, 0, 1))) as motor_mount_fillet_of_mirror_2_piece_8_section:
        with BuildLine():
            CenterArc((26.817840578, -50), MOTOR_MOUNT_FILLET_OF_MIRROR_2_R, 90, 48.639624147)
            ThreePointArc((-10.710571166, -16.960352423), (-4.681350326, -8.905770642), (0, 0))
            Line((0, 0), (26.817840578, 0))
        make_face()
    motor_mount_fillet_of_mirror_2_piece_8 = extrude(amount=73.044601445, mode=Mode.PRIVATE)
    motor_mount_fillet_of_mirror_2_piece_8 = motor_mount_fillet_of_mirror_2_piece_8 - Plane(origin=(0, 0, -60.544601445), x_dir=(-1, 0, 0), z_dir=(0, 0, 1)) * Cylinder(65.5, 254, mode=Mode.PRIVATE)
    motor_mount_fillet_of_mirror_2_piece_8 = split(motor_mount_fillet_of_mirror_2_piece_8, bisect_by=Plane(origin=(58.37165408, -25, 6.5), z_dir=(0, 0, -1)), keep=Keep.TOP, mode=Mode.PRIVATE)
    motor_mount_fillet_of_mirror_2_piece_8 = split(motor_mount_fillet_of_mirror_2_piece_8, bisect_by=Plane(origin=(58.37165408, -25, -6.5), z_dir=(0, 0, 1)), keep=Keep.TOP, mode=Mode.PRIVATE)
    add(motor_mount_fillet_of_mirror_2_piece_8)
    with BuildSketch(Plane(origin=(58.37165408, -25, 6.5), x_dir=(1, 0, 0), z_dir=(0, 0, 1))) as motor_mount_fillet_of_mirror_2_piece_9_section:
        with BuildLine():
            CenterArc((26.817840578, -50), MOTOR_MOUNT_FILLET_OF_MIRROR_2_R, 90, 48.639624147)
            ThreePointArc((-10.710571166, -16.960352423), (-4.681350326, -8.905770642), (0, 0))
            Line((0, 0), (26.817840578, 0))
        make_face()
    motor_mount_fillet_of_mirror_2_piece_9 = extrude(amount=6, mode=Mode.PRIVATE)
    motor_mount_fillet_of_mirror_2_piece_9 = motor_mount_fillet_of_mirror_2_piece_9 - Plane(origin=(0, 0, 6.5), x_dir=(-1, 0, 0), z_dir=(0, 0, 1)) * Cylinder(65.5, 120, mode=Mode.PRIVATE)
    add(motor_mount_fillet_of_mirror_2_piece_9)
    with BuildSketch(Plane(origin=(58.37165408, -25, 6.5), x_dir=(1, 0, 0), z_dir=(0, 0, 1))) as motor_mount_fillet_of_mirror_2_piece_10_section:
        with BuildLine():
            CenterArc((26.817840578, -50), MOTOR_MOUNT_FILLET_OF_MIRROR_2_R, 90, 48.639624147)
            ThreePointArc((-10.710571166, -16.960352423), (-4.681350326, -8.905770642), (0, 0))
            Line((0, 0), (26.817840578, 0))
        make_face()
    motor_mount_fillet_of_mirror_2_piece_10 = extrude(amount=6, mode=Mode.PRIVATE)
    motor_mount_fillet_of_mirror_2_piece_10 = motor_mount_fillet_of_mirror_2_piece_10 & Plane(origin=(0, 0, 6.5), x_dir=(-1, 0, 0), z_dir=(0, 0, 1)) * Cylinder(65.5, 120, mode=Mode.PRIVATE)
    add(motor_mount_fillet_of_mirror_2_piece_10)

    # bolt holes: up to this cylinder (the profile starts outside it)
    bolt_holes_end = Plane(origin=(0, 0, 0), z_dir=(0, 0, 1)) * Cylinder(BOLT_HOLES_END_RADIUS, 521.006, mode=Mode.PRIVATE)
    # Sketch13 → bolt holes (cut, up to the surface)
    with BuildSketch(Plane(origin=(0, 75.236352085, 0), x_dir=(1, 0, 0), z_dir=(0, 1, 0)), mode=Mode.PRIVATE) as bolt_holes_sk1:
        with Locations(Location((-8.73125, 0, 0), (0, 0, 270))):
            Circle(SKETCH13_R)
    bolt_holes_tool1 = extrude(bolt_holes_sk1.sketch, amount=-BOLT_HOLES_REACH, mode=Mode.PRIVATE) - bolt_holes_end
    add(bolt_holes_tool1.solids().sort_by_distance((-8.73125, 75.236352, 0))[0], mode=Mode.SUBTRACT)
    # Sketch13 → bolt holes (cut, up to the surface)
    with BuildSketch(Plane(origin=(0, 75.236352085, 0), x_dir=(1, 0, 0), z_dir=(0, 1, 0)), mode=Mode.PRIVATE) as bolt_holes_sk2:
        with Locations(Location((8.73125, 0, 0), (0, 0, 270))):
            Circle(SKETCH13_R)
    bolt_holes_tool2 = extrude(bolt_holes_sk2.sketch, amount=-BOLT_HOLES_REACH, mode=Mode.PRIVATE) - bolt_holes_end
    add(bolt_holes_tool2.solids().sort_by_distance((8.73125, 75.236352, 0))[0], mode=Mode.SUBTRACT)

    # Sketch15 → main keyway (cut, through all)
    with BuildSketch(Plane(origin=(0, 0, 0), x_dir=(1, 0, 0), z_dir=(0, 1, 0))):
        Rectangle(SKETCH15_W, SKETCH15_H)
    extrude(amount=-MAIN_KEYWAY_DEPTH, mode=Mode.SUBTRACT)

    # Sketch19 → harness cut (cut, two sides: drawn at the far end of the back side and taken through both)
    with BuildSketch(Plane(origin=(0, 0, 0), x_dir=(0, 0, -1), z_dir=(1, 0, 0)).offset(-HARNESS_CUT_DEPTH_BACK)):
        with Locations((0, 60)):
            Rectangle(SKETCH19_W, SKETCH19_H)
    extrude(amount=HARNESS_CUT_DEPTH + HARNESS_CUT_DEPTH_BACK, mode=Mode.SUBTRACT)

    # Sketch22 → Cut-Extrude1 (cut, through all)
    with BuildSketch(Plane.XY.offset(12.5)):
        with Locations((0, 69.736352085)):
            Circle(SKETCH22_R)
    extrude(amount=-CUT_EXTRUDE1_DEPTH, mode=Mode.SUBTRACT)

    # Fillet1: read off the stored shape, not the designer's step
    # Fillet1 outline → Fillet1 (cut)
    with BuildSketch(Plane.XY.offset(FILLET1_START)):
        with BuildLine():
            ThreePointArc((-59.087777959, 32.353776423), (-57.878619737, 32.227392221), (-57.685055751, 31.02715493))
            ThreePointArc((-57.685055751, 31.02715493), (-56.632563018, 32.909007977), (-55.51870064, 34.755199313))
            ThreePointArc((-55.51870064, 34.755199313), (-57.277401474, 33.516086803), (-59.087777959, 32.353776423))
        make_face()
        with BuildLine():
            ThreePointArc((-55.51870064, -34.755199313), (-56.632563018, -32.909007977), (-57.685055751, -31.02715493))
            ThreePointArc((-57.685055751, -31.02715493), (-57.878619737, -32.227392221), (-59.087777959, -32.353776423))
            ThreePointArc((-59.087777959, -32.353776423), (-57.277401474, -33.516086803), (-55.51870064, -34.755199313))
        make_face()
        with BuildLine():
            ThreePointArc((-98.756269464, 23.076923077), (-99.352234755, 24.196116135), (-98.37165408, 25))
            Line((-98.37165408, 25), (-108.37165408, 25))
            ThreePointArc((-108.37165408, 25), (-103.468750701, 24.514516892), (-98.756269464, 23.076923077))
        make_face()
        with BuildLine():
            Line((-108.37165408, -25), (-98.37165408, -25))
            ThreePointArc((-98.37165408, -25), (-99.352234755, -24.196116135), (-98.756269464, -23.076923077))
            ThreePointArc((-98.756269464, -23.076923077), (-103.468750701, -24.514516892), (-108.37165408, -25))
        make_face()
        with BuildLine():
            ThreePointArc((98.37165408, 25), (99.352234755, 24.196116135), (98.756269464, 23.076923077))
            ThreePointArc((98.756269464, 23.076923077), (103.468750701, 24.514516892), (108.37165408, 25))
            Line((108.37165408, 25), (98.37165408, 25))
        make_face()
        with BuildLine():
            ThreePointArc((98.756269464, -23.076923077), (99.352234755, -24.196116135), (98.37165408, -25))
            Line((98.37165408, -25), (108.37165408, -25))
            ThreePointArc((108.37165408, -25), (103.468750701, -24.514516892), (98.756269464, -23.076923077))
        make_face()
        with BuildLine():
            ThreePointArc((59.087777959, -32.353776423), (57.878619737, -32.227392221), (57.685055751, -31.02715493))
            ThreePointArc((57.685055751, -31.02715493), (56.632563018, -32.909007977), (55.51870064, -34.755199313))
            ThreePointArc((55.51870064, -34.755199313), (57.277401474, -33.516086803), (59.087777959, -32.353776423))
        make_face()
    extrude(amount=FILLET1_DEPTH, mode=Mode.SUBTRACT)

    # Sketch18 → split for printing (cut, through all)
    with BuildSketch(Plane(origin=(0, 0, 0), x_dir=(0, 0, -1), z_dir=(1, 0, 0))):
        with Locations((3.413587171, -1.264778097)):
            Rectangle(SKETCH18_W, SKETCH18_H)
    extrude(amount=-SPLIT_FOR_PRINTING_DEPTH, mode=Mode.SUBTRACT)


solid = part.part
